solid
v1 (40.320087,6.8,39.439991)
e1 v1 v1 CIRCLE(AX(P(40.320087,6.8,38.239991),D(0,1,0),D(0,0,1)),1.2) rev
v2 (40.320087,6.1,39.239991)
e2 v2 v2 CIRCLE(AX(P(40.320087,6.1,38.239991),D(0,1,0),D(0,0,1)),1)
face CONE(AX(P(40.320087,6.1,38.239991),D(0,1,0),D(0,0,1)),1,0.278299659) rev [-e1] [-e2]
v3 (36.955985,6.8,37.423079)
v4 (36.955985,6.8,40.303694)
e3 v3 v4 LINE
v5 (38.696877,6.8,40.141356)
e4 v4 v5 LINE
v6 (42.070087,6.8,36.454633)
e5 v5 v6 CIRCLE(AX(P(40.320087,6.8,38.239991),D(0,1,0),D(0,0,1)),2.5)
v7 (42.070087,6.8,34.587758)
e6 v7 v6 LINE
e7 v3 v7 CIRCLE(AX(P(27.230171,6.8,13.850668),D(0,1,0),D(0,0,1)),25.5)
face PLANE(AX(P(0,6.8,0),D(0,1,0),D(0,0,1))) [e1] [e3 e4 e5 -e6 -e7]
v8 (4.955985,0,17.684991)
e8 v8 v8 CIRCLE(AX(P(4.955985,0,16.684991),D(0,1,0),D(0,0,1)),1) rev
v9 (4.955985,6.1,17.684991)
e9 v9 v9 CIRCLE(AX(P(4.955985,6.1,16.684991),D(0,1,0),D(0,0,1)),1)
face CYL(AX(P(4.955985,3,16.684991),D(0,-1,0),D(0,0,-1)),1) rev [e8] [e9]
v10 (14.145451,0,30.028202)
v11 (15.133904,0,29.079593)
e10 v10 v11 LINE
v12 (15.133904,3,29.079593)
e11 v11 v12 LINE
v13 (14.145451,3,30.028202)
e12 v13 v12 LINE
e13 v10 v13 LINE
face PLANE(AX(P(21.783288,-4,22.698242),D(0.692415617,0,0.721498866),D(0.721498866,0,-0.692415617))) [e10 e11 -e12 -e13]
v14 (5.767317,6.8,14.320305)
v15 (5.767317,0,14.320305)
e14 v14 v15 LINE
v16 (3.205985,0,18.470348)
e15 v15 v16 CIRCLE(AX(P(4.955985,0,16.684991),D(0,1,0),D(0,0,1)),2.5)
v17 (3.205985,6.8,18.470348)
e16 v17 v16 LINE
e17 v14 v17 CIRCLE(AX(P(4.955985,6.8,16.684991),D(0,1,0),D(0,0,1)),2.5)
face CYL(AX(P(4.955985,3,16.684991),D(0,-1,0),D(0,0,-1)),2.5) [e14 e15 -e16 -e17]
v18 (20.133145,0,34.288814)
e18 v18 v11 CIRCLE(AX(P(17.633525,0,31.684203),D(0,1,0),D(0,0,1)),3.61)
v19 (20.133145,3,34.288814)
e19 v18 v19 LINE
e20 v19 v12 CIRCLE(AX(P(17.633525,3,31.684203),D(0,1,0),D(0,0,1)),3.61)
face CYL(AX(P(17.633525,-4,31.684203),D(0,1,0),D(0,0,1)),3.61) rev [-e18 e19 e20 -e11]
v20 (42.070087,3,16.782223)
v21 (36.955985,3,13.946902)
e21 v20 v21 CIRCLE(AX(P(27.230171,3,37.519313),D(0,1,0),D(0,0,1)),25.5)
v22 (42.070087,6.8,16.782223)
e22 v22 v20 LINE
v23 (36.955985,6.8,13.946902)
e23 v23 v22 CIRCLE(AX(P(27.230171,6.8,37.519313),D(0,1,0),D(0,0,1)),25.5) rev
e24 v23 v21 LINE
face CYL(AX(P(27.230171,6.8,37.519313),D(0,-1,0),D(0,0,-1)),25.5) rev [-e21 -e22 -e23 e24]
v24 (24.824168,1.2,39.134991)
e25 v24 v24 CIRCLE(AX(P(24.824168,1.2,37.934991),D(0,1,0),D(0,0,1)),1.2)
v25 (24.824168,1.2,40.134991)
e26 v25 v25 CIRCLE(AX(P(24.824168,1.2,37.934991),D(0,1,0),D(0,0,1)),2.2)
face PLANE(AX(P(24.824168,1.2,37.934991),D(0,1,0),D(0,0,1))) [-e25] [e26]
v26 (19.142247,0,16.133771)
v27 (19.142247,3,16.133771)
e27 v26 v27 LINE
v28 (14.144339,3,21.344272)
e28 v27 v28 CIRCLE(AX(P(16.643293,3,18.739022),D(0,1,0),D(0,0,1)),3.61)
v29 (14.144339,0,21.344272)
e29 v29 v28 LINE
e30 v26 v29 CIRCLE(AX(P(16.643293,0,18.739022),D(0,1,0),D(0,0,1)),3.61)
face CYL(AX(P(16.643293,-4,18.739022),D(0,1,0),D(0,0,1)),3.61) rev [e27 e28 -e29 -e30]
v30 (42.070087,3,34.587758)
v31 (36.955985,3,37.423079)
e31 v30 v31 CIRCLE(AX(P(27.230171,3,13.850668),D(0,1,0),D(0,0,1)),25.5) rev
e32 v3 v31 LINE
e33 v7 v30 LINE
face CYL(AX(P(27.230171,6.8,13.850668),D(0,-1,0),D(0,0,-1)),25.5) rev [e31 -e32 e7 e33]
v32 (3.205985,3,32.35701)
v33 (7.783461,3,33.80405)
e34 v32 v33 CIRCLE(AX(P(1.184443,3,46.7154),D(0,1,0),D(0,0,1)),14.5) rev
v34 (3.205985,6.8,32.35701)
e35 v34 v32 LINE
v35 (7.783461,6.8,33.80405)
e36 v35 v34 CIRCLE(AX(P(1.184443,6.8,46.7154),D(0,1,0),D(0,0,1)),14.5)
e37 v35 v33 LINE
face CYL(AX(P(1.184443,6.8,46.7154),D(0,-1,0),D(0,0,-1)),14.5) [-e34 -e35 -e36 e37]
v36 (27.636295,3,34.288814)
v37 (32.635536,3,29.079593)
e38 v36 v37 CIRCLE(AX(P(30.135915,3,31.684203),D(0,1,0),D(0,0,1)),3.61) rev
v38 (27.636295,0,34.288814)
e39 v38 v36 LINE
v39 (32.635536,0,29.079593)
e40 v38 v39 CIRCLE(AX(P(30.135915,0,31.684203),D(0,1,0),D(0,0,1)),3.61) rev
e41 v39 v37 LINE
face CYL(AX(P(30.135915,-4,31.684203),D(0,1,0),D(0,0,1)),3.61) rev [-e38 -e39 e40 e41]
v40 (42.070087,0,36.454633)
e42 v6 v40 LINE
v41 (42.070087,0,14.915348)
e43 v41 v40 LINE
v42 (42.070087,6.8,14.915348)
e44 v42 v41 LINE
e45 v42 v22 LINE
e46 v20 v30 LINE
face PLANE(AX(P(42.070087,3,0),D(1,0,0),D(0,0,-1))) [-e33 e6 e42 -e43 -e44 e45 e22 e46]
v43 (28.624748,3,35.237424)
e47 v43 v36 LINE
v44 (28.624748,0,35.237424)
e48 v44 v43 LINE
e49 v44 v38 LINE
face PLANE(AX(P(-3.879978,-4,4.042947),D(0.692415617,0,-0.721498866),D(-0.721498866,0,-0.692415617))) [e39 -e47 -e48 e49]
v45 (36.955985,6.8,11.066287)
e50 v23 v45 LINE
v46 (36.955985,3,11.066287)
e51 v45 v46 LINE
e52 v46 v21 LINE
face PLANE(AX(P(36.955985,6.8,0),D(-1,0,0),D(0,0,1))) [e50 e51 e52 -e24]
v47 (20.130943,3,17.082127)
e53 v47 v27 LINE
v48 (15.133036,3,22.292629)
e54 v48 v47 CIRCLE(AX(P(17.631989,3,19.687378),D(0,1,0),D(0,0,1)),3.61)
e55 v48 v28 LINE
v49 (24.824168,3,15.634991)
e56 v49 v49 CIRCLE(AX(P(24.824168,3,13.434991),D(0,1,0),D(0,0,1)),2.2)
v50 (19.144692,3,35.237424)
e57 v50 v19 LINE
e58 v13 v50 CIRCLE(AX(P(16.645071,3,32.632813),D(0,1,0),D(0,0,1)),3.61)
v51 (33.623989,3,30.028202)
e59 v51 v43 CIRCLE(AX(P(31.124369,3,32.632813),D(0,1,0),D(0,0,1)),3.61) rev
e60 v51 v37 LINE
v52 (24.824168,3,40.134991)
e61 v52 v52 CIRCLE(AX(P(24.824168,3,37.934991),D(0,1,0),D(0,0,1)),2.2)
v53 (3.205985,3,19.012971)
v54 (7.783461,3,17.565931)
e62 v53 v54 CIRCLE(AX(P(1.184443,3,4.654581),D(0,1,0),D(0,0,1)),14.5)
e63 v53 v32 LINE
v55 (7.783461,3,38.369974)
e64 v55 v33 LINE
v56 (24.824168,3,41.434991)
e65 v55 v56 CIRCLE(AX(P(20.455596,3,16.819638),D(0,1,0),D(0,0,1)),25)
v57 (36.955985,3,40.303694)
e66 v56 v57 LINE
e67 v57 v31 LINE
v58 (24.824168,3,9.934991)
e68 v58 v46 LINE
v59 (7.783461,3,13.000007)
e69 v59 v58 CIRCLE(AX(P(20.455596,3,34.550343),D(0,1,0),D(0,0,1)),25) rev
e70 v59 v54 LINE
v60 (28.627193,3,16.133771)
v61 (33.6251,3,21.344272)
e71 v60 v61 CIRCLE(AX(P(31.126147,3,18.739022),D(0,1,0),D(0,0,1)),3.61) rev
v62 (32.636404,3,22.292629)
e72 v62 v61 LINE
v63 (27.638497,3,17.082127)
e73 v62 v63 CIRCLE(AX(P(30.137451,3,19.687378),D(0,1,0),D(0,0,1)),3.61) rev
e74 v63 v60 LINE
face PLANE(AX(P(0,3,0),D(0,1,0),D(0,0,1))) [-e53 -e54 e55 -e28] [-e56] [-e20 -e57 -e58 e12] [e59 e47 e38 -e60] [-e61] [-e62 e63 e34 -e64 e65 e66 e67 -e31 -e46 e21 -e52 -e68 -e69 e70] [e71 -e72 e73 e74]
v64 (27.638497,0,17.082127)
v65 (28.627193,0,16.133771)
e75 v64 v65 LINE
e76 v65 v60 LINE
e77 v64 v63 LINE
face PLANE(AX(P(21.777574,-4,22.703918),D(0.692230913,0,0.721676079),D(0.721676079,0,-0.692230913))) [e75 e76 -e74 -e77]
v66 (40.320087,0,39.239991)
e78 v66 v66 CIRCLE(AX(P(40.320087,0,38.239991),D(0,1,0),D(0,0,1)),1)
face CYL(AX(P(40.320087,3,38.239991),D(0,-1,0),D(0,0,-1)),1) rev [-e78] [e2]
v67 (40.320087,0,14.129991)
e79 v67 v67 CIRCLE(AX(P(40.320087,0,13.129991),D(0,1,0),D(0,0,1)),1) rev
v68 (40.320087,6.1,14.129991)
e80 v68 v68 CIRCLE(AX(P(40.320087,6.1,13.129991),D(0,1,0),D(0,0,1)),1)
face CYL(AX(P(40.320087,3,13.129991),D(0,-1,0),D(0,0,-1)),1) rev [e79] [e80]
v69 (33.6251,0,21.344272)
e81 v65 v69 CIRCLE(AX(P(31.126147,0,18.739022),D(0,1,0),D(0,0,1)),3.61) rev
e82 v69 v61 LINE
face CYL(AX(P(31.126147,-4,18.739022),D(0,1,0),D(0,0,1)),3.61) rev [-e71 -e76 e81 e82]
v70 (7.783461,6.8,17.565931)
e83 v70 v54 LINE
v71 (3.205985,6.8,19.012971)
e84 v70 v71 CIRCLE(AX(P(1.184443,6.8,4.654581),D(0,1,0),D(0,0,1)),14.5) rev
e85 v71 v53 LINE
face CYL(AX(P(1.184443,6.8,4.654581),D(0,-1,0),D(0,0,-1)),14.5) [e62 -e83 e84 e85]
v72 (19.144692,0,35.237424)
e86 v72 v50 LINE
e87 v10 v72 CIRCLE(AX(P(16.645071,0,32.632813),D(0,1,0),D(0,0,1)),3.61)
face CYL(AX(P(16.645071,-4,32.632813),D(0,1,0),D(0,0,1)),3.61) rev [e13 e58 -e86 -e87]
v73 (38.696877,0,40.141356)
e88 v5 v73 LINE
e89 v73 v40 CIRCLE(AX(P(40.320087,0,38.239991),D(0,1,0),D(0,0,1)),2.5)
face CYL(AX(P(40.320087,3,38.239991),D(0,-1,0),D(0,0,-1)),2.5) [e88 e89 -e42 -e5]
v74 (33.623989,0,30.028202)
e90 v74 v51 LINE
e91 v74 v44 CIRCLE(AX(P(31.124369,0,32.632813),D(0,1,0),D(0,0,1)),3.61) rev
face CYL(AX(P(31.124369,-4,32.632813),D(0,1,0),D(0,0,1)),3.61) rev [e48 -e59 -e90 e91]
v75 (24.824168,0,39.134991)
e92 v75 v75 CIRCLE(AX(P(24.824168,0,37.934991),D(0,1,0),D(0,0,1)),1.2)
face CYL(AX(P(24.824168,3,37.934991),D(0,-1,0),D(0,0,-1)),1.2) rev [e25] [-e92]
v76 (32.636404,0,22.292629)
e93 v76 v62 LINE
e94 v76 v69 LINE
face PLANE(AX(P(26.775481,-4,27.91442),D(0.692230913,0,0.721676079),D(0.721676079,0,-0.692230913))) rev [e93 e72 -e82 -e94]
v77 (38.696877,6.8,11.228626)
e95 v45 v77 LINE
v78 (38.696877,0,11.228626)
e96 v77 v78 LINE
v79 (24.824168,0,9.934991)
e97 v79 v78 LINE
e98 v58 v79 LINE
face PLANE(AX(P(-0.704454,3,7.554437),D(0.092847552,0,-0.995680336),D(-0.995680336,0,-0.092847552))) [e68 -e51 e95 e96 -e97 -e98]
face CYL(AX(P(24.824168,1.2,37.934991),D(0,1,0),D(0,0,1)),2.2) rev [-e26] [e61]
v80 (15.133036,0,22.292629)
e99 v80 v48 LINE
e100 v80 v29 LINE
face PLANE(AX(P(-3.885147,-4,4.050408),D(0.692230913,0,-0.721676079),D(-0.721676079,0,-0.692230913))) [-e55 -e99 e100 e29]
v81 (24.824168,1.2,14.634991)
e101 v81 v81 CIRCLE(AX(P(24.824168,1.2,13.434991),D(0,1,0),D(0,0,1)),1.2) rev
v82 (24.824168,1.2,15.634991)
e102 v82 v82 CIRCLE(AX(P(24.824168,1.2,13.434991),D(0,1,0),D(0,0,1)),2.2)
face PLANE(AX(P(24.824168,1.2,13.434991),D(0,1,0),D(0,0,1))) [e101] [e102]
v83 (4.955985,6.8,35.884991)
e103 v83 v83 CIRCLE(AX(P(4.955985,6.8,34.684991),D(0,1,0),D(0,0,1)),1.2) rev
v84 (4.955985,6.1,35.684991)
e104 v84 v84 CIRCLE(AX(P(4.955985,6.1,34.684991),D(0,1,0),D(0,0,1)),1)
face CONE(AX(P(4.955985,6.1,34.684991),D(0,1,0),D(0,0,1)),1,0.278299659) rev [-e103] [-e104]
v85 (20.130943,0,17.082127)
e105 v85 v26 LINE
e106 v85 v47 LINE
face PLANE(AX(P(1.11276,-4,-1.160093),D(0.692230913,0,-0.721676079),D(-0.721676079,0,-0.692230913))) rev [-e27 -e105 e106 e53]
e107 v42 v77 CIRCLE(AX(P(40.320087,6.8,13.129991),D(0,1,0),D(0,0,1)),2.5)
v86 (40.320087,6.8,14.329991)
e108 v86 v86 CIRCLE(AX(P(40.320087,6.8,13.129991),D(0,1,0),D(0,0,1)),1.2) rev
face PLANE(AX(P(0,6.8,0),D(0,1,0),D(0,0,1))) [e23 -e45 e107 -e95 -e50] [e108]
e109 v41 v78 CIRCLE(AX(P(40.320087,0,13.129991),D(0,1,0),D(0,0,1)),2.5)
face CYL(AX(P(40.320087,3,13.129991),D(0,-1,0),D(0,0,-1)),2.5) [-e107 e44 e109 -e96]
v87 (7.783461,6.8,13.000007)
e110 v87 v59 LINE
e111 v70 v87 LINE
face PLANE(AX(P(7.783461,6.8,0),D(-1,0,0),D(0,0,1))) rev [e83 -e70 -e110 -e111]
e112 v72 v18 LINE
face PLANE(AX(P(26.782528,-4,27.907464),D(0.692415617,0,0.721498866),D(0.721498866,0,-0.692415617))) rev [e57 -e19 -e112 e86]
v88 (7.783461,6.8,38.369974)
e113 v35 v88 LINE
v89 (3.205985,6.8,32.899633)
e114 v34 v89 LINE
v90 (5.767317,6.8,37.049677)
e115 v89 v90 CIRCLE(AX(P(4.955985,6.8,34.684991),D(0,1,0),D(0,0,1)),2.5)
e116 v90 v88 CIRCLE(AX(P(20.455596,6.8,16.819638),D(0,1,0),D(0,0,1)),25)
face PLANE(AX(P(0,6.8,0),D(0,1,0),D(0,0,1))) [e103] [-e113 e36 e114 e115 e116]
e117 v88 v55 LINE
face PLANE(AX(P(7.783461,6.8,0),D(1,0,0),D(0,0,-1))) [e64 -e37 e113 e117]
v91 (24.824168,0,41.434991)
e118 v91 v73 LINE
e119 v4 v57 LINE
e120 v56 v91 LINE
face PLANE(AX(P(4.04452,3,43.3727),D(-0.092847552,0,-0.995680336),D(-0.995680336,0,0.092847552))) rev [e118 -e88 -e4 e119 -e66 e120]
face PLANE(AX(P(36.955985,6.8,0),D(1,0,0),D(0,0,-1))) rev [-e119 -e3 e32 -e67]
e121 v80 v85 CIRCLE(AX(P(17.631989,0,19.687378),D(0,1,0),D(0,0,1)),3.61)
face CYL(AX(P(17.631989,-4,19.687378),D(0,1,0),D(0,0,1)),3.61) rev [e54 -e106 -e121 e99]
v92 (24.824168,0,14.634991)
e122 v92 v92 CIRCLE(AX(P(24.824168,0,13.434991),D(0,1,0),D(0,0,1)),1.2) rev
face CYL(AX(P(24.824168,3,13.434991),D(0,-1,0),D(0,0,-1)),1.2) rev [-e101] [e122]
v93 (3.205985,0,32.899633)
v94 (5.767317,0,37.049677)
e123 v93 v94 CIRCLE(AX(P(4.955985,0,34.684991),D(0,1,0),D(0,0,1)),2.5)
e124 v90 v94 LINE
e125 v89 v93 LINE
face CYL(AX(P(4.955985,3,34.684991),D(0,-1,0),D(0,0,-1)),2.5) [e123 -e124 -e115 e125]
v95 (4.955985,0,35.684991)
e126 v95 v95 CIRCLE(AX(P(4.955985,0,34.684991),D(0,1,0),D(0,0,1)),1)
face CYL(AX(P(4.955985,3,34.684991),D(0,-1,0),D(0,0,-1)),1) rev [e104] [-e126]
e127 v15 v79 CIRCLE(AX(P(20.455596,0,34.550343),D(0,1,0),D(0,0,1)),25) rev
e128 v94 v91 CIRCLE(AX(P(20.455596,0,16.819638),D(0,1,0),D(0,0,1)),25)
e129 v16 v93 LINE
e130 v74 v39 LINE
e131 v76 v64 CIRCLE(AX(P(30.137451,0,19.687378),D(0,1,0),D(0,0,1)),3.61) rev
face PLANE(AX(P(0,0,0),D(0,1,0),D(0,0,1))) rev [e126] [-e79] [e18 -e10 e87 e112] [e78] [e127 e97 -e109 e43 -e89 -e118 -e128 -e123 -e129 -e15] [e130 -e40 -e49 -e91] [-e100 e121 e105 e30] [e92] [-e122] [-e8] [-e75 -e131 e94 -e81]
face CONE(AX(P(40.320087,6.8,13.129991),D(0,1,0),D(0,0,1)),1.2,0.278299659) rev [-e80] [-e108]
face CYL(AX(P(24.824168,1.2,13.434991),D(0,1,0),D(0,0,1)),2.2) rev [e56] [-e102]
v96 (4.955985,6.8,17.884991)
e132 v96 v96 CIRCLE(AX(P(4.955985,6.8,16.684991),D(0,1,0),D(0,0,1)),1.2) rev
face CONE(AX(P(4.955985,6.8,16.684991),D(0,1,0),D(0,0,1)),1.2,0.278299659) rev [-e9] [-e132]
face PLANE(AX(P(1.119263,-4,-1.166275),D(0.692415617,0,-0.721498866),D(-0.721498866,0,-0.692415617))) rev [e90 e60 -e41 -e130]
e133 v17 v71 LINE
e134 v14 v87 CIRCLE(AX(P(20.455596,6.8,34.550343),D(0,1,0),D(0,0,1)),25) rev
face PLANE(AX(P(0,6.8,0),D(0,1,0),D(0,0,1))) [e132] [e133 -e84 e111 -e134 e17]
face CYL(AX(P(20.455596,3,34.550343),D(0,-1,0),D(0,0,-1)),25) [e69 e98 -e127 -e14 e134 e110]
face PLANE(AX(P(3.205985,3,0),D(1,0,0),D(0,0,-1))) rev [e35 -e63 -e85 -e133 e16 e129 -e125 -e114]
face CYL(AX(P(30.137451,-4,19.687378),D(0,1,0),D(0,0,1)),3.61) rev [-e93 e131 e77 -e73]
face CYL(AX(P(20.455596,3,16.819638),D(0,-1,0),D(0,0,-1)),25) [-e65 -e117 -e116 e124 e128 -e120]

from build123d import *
from OCP.BRepFilletAPI import BRepFilletAPI_MakeChamfer

# Parameters (mm, degrees)
SKETCH1_R           = 1
BOSS_EXTRUDE1_DEPTH = 3
SKETCH1_5_R         = 1
BOSS_EXTRUDE2_DEPTH = 6.8
CUT_EXTRUDE1_DEPTH  = 7
SKETCH3_R           = 2
CUT_EXTRUDE2_DEPTH  = 1.8
MOVE_START          = 3
MOVE_FACE1_DEPTH    = 3.8
MOVE_FACE2_BY       = 0.2
MOVE_FACE2_2_BY     = 0.2
MOVE_FACE2_3_BY     = 0.2
MOVE_FACE2_4_BY     = 0.2
CHAMFER1_SIZE       = 0.7
CHAMFER1_SIZE2      = 0.2
CHAMFER2_SIZE       = 0.2
CHAMFER2_SIZE2      = 0.7


# Read off the part's stored shape, not the designer's step: Move Face1
with BuildPart() as part:
    # Sketch1 → Boss-Extrude1 (new body)
    with BuildSketch(Plane(origin=(0, 0, 0), x_dir=(1, 0, 0), z_dir=(0, 1, 0))):
        with BuildLine():
            Line((24.824168418, -41.434990566), (38.696876617, -40.141355505))
            ThreePointArc((38.696876617, -40.141355505), (42.164537627, -39.927592778), (42.070086822, -36.454633459))
            Line((42.070086822, -36.454633459), (42.070086822, -14.915347673))
            ThreePointArc((42.070086822, -14.915347673), (42.164537627, -11.442388354), (38.696876617, -11.228625627))
            Line((38.696876617, -11.228625627), (24.824168418, -9.934990566))
            ThreePointArc((24.824168418, -9.934990566), (14.849186159, -10.187088505), (5.767316865, -14.320304511))
            ThreePointArc((5.767316865, -14.320304511), (2.828547545, -15.371974531), (3.205984711, -18.470347673))
            Line((3.205984711, -18.470347673), (3.205984711, -32.899633459))
            ThreePointArc((3.205984711, -32.899633459), (2.828547545, -35.998006601), (5.767316865, -37.04967662))
            ThreePointArc((5.767316865, -37.04967662), (14.849186159, -41.182892626), (24.824168418, -41.434990566))
        make_face()
        with Locations(Location((4.955984711, -34.684990566, 0), (0, 0, 270))):
            Circle(SKETCH1_R, mode=Mode.SUBTRACT)
        with Locations(Location((24.824168418, -37.934990566, 0), (0, 0, 270))):
            Circle(SKETCH1_R, mode=Mode.SUBTRACT)
        with Locations(Location((40.320086822, -38.239990566, 0), (0, 0, 270))):
            Circle(SKETCH1_R, mode=Mode.SUBTRACT)
        with Locations(Location((4.955984711, -16.684990566, 0), (0, 0, 270))):
            Circle(SKETCH1_R, mode=Mode.SUBTRACT)
        with Locations(Location((24.824168418, -13.434990566, 0), (0, 0, 270))):
            Circle(SKETCH1_R, mode=Mode.SUBTRACT)
        with Locations(Location((40.320086822, -13.129990566, 0), (0, 0, 270))):
            Circle(SKETCH1_R, mode=Mode.SUBTRACT)
    extrude(amount=BOSS_EXTRUDE1_DEPTH)

    # Sketch1<5> → Boss-Extrude2 (add)
    # profile 1 of 8: a face of its own
    with BuildSketch(Plane(origin=(0, 0, 0), x_dir=(1, 0, 0), z_dir=(0, 1, 0))):
        with BuildLine():
            ThreePointArc((5.767316865, -37.04967662), (6.75947019, -37.734134037), (7.783460986, -38.369974447))
            Line((7.783460986, -38.369974447), (7.783460986, -33.244952788))
            ThreePointArc((7.783460986, -33.244952788), (6.373824255, -32.641654601), (4.909963227, -32.185414197))
            ThreePointArc((4.909963227, -32.185414197), (4.062798529, -31.99415486), (3.205984711, -31.852245597))
            Line((3.205984711, -31.852245597), (3.205984711, -32.899633459))
            Line((3.205984711, -32.899633459), (3.205984711, -34.684990566))
            ThreePointArc((3.205984711, -34.684990566), (3.718547844, -35.922427433), (4.955984711, -36.434990566))
            ThreePointArc((4.955984711, -36.434990566), (5.358522051, -36.746463253), (5.767316865, -37.04967662))
        make_face()
        with Locations(Location((4.955984711, -34.684990566, 0), (0, 0, 270))):
            Circle(SKETCH1_5_R, mode=Mode.SUBTRACT)
    # profile 2 of 8: a face of its own
    with BuildSketch(Plane(origin=(0, 0, 0), x_dir=(1, 0, 0), z_dir=(0, 1, 0))):
        with BuildLine():
            ThreePointArc((36.955984711, -14.488712586), (39.599003683, -15.793476237), (42.070086822, -17.400244917))
            Line((42.070086822, -17.400244917), (42.070086822, -14.915347673))
            Line((42.070086822, -14.915347673), (42.070086822, -13.129990566))
            ThreePointArc((42.070086822, -13.129990566), (41.557523689, -11.892553699), (40.320086822, -11.379990566))
            Line((40.320086822, -11.379990566), (38.696876617, -11.228625627))
            Line((38.696876617, -11.228625627), (36.955984711, -11.066286826))
            Line((36.955984711, -11.066286826), (36.955984711, -14.488712586))
        make_face()
        with Locations(Location((40.320086822, -13.129990566, 0), (0, 0, 270))):
            Circle(SKETCH1_5_R, mode=Mode.SUBTRACT)
    # profile 3 of 8: a face of its own
    with BuildSketch(Plane(origin=(0, 0, 0), x_dir=(1, 0, 0), z_dir=(0, 1, 0))):
        with BuildLine():
            Line((3.205984711, -18.470347673), (3.205984711, -19.517735535))
            ThreePointArc((3.205984711, -19.517735535), (5.55061073, -19.005071272), (7.783460986, -18.125028343))
            Line((7.783460986, -18.125028343), (7.783460986, -13.000006684))
            ThreePointArc((7.783460986, -13.000006684), (6.75947019, -13.635847094), (5.767316865, -14.320304511))
            ThreePointArc((5.767316865, -14.320304511), (5.358522051, -14.623517879), (4.955984711, -14.934990566))
            ThreePointArc((4.955984711, -14.934990566), (3.718547844, -15.447553699), (3.205984711, -16.684990566))
            Line((3.205984711, -16.684990566), (3.205984711, -18.470347673))
        make_face()
        with Locations(Location((4.955984711, -16.684990566, 0), (0, 0, 270))):
            Circle(SKETCH1_5_R, mode=Mode.SUBTRACT)
    # profile 4 of 8: a face of its own
    with BuildSketch(Plane(origin=(0, 0, 0), x_dir=(1, 0, 0), z_dir=(0, 1, 0))):
        with BuildLine():
            Line((36.955984711, -36.881268545), (36.955984711, -40.303694305))
            Line((36.955984711, -40.303694305), (38.696876617, -40.141355505))
            Line((38.696876617, -40.141355505), (40.320086822, -39.989990566))
            ThreePointArc((40.320086822, -39.989990566), (41.557523689, -39.477427433), (42.070086822, -38.239990566))
            Line((42.070086822, -38.239990566), (42.070086822, -36.454633459))
            Line((42.070086822, -36.454633459), (42.070086822, -33.969736214))
            ThreePointArc((42.070086822, -33.969736214), (39.599003683, -35.576504894), (36.955984711, -36.881268545))
        make_face()
        with Locations(Location((40.320086822, -38.239990566, 0), (0, 0, 270))):
            Circle(SKETCH1_5_R, mode=Mode.SUBTRACT)
    # profile 5 of 8: a face of its own
    with BuildSketch(Plane(origin=(0, 0, 0), x_dir=(1, 0, 0), z_dir=(0, 1, 0))):
        with BuildLine():
            ThreePointArc((5.767316865, -14.320304511), (2.828547545, -15.371974531), (3.205984711, -18.470347673))
            Line((3.205984711, -18.470347673), (3.205984711, -16.684990566))
            ThreePointArc((3.205984711, -16.684990566), (3.718547844, -15.447553699), (4.955984711, -14.934990566))
            ThreePointArc((4.955984711, -14.934990566), (5.358522051, -14.623517879), (5.767316865, -14.320304511))
        make_face()
    # profile 6 of 8: a face of its own
    with BuildSketch(Plane(origin=(0, 0, 0), x_dir=(1, 0, 0), z_dir=(0, 1, 0))):
        with BuildLine():
            ThreePointArc((3.205984711, -32.899633459), (2.828547545, -35.998006601), (5.767316865, -37.04967662))
            ThreePointArc((5.767316865, -37.04967662), (5.358522051, -36.746463253), (4.955984711, -36.434990566))
            ThreePointArc((4.955984711, -36.434990566), (3.718547844, -35.922427433), (3.205984711, -34.684990566))
            Line((3.205984711, -34.684990566), (3.205984711, -32.899633459))
        make_face()
    # profile 7 of 8: a face of its own
    with BuildSketch(Plane(origin=(0, 0, 0), x_dir=(1, 0, 0), z_dir=(0, 1, 0))):
        with BuildLine():
            Line((42.070086822, -13.129990566), (42.070086822, -14.915347673))
            ThreePointArc((42.070086822, -14.915347673), (42.164537627, -11.442388354), (38.696876617, -11.228625627))
            Line((38.696876617, -11.228625627), (40.320086822, -11.379990566))
            ThreePointArc((40.320086822, -11.379990566), (41.557523689, -11.892553699), (42.070086822, -13.129990566))
        make_face()
    # profile 8 of 8: a face of its own
    with BuildSketch(Plane(origin=(0, 0, 0), x_dir=(1, 0, 0), z_dir=(0, 1, 0))):
        with BuildLine():
            Line((40.320086822, -39.989990566), (38.696876617, -40.141355505))
            ThreePointArc((38.696876617, -40.141355505), (42.164537627, -39.927592778), (42.070086822, -36.454633459))
            Line((42.070086822, -36.454633459), (42.070086822, -38.239990566))
            ThreePointArc((42.070086822, -38.239990566), (41.557523689, -39.477427433), (40.320086822, -39.989990566))
        make_face()
    extrude(amount=BOSS_EXTRUDE2_DEPTH)

    # Sketch2 → Cut-Extrude1 (cut)
    # profile 1 of 7: a face of its own
    with BuildSketch(Plane(origin=(0, 3, 0), x_dir=(1, 0, 0), z_dir=(0, 1, 0))):
        with BuildLine():
            Line((15.133035567, -22.292628664), (14.144339339, -21.344272313))
            ThreePointArc((14.144339339, -21.344272313), (14.038042286, -16.240068072), (19.142246528, -16.13377102))
            Line((19.142246528, -16.13377102), (20.130942756, -17.08212737))
            ThreePointArc((20.130942756, -17.08212737), (20.237239809, -22.186331611), (15.133035567, -22.292628664))
        make_face()
        with BuildLine():
            ThreePointArc((17.757784702, -17.577123179), (15.481394445, -17.624529897), (15.528801164, -19.900920155))
            Line((15.528801164, -19.900920155), (16.517497393, -20.849276505))
            ThreePointArc((16.517497393, -20.849276505), (18.79388765, -20.801869786), (18.746480931, -18.525479529))
            Line((18.746480931, -18.525479529), (17.757784702, -17.577123179))
        make_face(mode=Mode.SUBTRACT)
    # profile 2 of 7: a face of its own
    with BuildSketch(Plane(origin=(0, 3, 0), x_dir=(1, 0, 0), z_dir=(0, 1, 0))):
        with BuildLine():
            ThreePointArc((32.636404248, -22.292628664), (27.532200006, -22.186331611), (27.638497059, -17.08212737))
            Line((27.638497059, -17.08212737), (28.627193287, -16.13377102))
            ThreePointArc((28.627193287, -16.13377102), (33.731397529, -16.240068072), (33.625100476, -21.344272313))
            Line((33.625100476, -21.344272313), (32.636404248, -22.292628664))
        make_face()
        with BuildLine():
            Line((29.022958884, -18.525479529), (30.011655113, -17.577123179))
            ThreePointArc((30.011655113, -17.577123179), (32.28804537, -17.624529897), (32.240638651, -19.900920155))
            Line((32.240638651, -19.900920155), (31.251942422, -20.849276505))
            ThreePointArc((31.251942422, -20.849276505), (28.975552165, -20.801869786), (29.022958884, -18.525479529))
        make_face(mode=Mode.SUBTRACT)
    # profile 3 of 7: a face of its own
    with BuildSketch(Plane(origin=(0, 3, 0), x_dir=(1, 0, 0), z_dir=(0, 1, 0))):
        with BuildLine():
            ThreePointArc((30.011655113, -17.577123179), (32.28804537, -17.624529897), (32.240638651, -19.900920155))
            Line((32.240638651, -19.900920155), (31.251942422, -20.849276505))
            ThreePointArc((31.251942422, -20.849276505), (28.975552165, -20.801869786), (29.022958884, -18.525479529))
            Line((29.022958884, -18.525479529), (30.011655113, -17.577123179))
        make_face()
    # profile 4 of 7: a face of its own
    with BuildSketch(Plane(origin=(0, 3, 0), x_dir=(1, 0, 0), z_dir=(0, 1, 0))):
        with BuildLine():
            ThreePointArc((33.623989066, -30.028201915), (33.728979595, -35.132433198), (28.624748312, -35.237423727))
            Line((28.624748312, -35.237423727), (27.636294866, -34.288814332))
            ThreePointArc((27.636294866, -34.288814332), (27.531304337, -29.184583049), (32.63553562, -29.07959252))
            Line((32.63553562, -29.07959252), (33.623989066, -30.028201915))
        make_face()
        with BuildLine():
            Line((30.009579546, -33.794425995), (29.0211261, -32.8458166))
            ThreePointArc((29.0211261, -32.8458166), (28.974302069, -30.569414283), (31.250704386, -30.522590252))
            Line((31.250704386, -30.522590252), (32.239157832, -31.471199647))
            ThreePointArc((32.239157832, -31.471199647), (32.285981863, -33.747601964), (30.009579546, -33.794425995))
        make_face(mode=Mode.SUBTRACT)
    # profile 5 of 7: a face of its own
    with BuildSketch(Plane(origin=(0, 3, 0), x_dir=(1, 0, 0), z_dir=(0, 1, 0))):
        with BuildLine():
            ThreePointArc((29.0211261, -32.8458166), (28.974302069, -30.569414283), (31.250704386, -30.522590252))
            Line((31.250704386, -30.522590252), (32.239157832, -31.471199647))
            ThreePointArc((32.239157832, -31.471199647), (32.285981863, -33.747601964), (30.009579546, -33.794425995))
            Line((30.009579546, -33.794425995), (29.0211261, -32.8458166))
        make_face()
    # profile 6 of 7: a face of its own
    with BuildSketch(Plane(origin=(0, 3, 0), x_dir=(1, 0, 0), z_dir=(0, 1, 0))):
        with BuildLine():
            Line((14.145450749, -30.028201915), (15.133904195, -29.07959252))
            ThreePointArc((15.133904195, -29.07959252), (20.238135478, -29.184583049), (20.133144949, -34.288814332))
            Line((20.133144949, -34.288814332), (19.144691503, -35.237423727))
            ThreePointArc((19.144691503, -35.237423727), (14.04046022, -35.132433198), (14.145450749, -30.028201915))
        make_face()
        with BuildLine():
            ThreePointArc((18.748313715, -32.8458166), (18.795137746, -30.569414283), (16.518735429, -30.522590252))
            Line((16.518735429, -30.522590252), (15.530281983, -31.471199647))
            ThreePointArc((15.530281983, -31.471199647), (15.483457952, -33.747601964), (17.759860269, -33.794425995))
            Line((17.759860269, -33.794425995), (18.748313715, -32.8458166))
        make_face(mode=Mode.SUBTRACT)
    # profile 7 of 7: a face of its own
    with BuildSketch(Plane(origin=(0, 3, 0), x_dir=(1, 0, 0), z_dir=(0, 1, 0))):
        with BuildLine():
            Line((17.759860269, -33.794425995), (18.748313715, -32.8458166))
            ThreePointArc((18.748313715, -32.8458166), (18.795137746, -30.569414283), (16.518735429, -30.522590252))
            Line((16.518735429, -30.522590252), (15.530281983, -31.471199647))
            ThreePointArc((15.530281983, -31.471199647), (15.483457952, -33.747601964), (17.759860269, -33.794425995))
        make_face()
    extrude(amount=-CUT_EXTRUDE1_DEPTH, mode=Mode.SUBTRACT)


with BuildPart() as cut_extrude1_kept_piece:
    # of the separate pieces the step leaves, the one the design keeps (cut_extrude1_pieces_kept)
    add(part.part.solids().sort_by_distance((24.824168418, 0, 41.434990566))[0])

    # Sketch3 → Cut-Extrude2 (cut)
    with BuildSketch(Plane(origin=(0, 3, 0), x_dir=(1, 0, 0), z_dir=(0, 1, 0))):
        with Locations(Location((24.824168418, -13.434990566, 0), (0, 0, 270))):
            Circle(SKETCH3_R)
        with Locations(Location((24.824168418, -37.934990566, 0), (0, 0, 270))):
            Circle(SKETCH3_R)
    extrude(amount=-CUT_EXTRUDE2_DEPTH, mode=Mode.SUBTRACT)

    # Move Face1 outline → Move Face1 (cut)
    with BuildSketch(Plane(origin=(0, 0, 0), x_dir=(1, 0, 0), z_dir=(0, 1, 0)).offset(MOVE_START)):
        with BuildLine():
            Line((7.783460986, -18.125028343), (7.783460986, -17.565930728))
            ThreePointArc((7.783460986, -17.565930728), (5.555025764, -18.48020931), (3.205984711, -19.012970982))
            Line((3.205984711, -19.012970982), (3.205984711, -19.517735535))
            ThreePointArc((3.205984711, -19.517735535), (5.550610731, -19.005071272), (7.783460986, -18.125028343))
        make_face()
        with BuildLine():
            ThreePointArc((7.783460986, -33.244952788), (5.550610731, -32.364909859), (3.205984711, -31.852245597))
            Line((3.205984711, -31.852245597), (3.205984711, -32.357010149))
            ThreePointArc((3.205984711, -32.357010149), (5.555025764, -32.889771821), (7.783460986, -33.804050403))
            Line((7.783460986, -33.804050403), (7.783460986, -33.244952788))
        make_face()
        with BuildLine():
            Line((42.070086822, -34.587758113), (42.070086822, -33.969736214))
            ThreePointArc((42.070086822, -33.969736214), (39.599003683, -35.576504894), (36.955984711, -36.881268545))
            Line((36.955984711, -36.881268545), (36.955984711, -37.423079034))
            ThreePointArc((36.955984711, -37.423079034), (39.594576687, -36.152494903), (42.070086822, -34.587758113))
        make_face()
        with BuildLine():
            ThreePointArc((42.070086822, -16.782223018), (39.594576687, -15.217486228), (36.955984711, -13.946902097))
            Line((36.955984711, -13.946902097), (36.955984711, -14.488712586))
            ThreePointArc((36.955984711, -14.488712586), (39.599003683, -15.793476237), (42.070086822, -17.400244917))
            Line((42.070086822, -17.400244917), (42.070086822, -16.782223018))
        make_face()
    extrude(amount=MOVE_FACE1_DEPTH, mode=Mode.SUBTRACT)

    # Move Face2: a curved face moved inward by 0.2
    add(Solid.thicken(cut_extrude1_kept_piece.faces().sort_by_distance((24.824168418, 2.1, 11.434990566))[0], -MOVE_FACE2_BY), mode=Mode.SUBTRACT)

    # Move Face2 2: a curved face moved inward by 0.2
    add(Solid.thicken(cut_extrude1_kept_piece.faces().sort_by_distance((24.824168418, 2.1, 35.934990566))[0], -MOVE_FACE2_2_BY), mode=Mode.SUBTRACT)

    # Move Face2 3: a curved face moved inward by 0.2
    add(Solid.thicken(cut_extrude1_kept_piece.faces().sort_by_distance((24.824168418, 0.6, 12.434990566))[0], -MOVE_FACE2_3_BY), mode=Mode.SUBTRACT)

    # Move Face2 4: a curved face moved inward by 0.2
    add(Solid.thicken(cut_extrude1_kept_piece.faces().sort_by_distance((24.824168418, 0.6, 36.934990566))[0], -MOVE_FACE2_4_BY), mode=Mode.SUBTRACT)

    # Chamfer1: one chamfer whose edges measure the first distance from different faces: ONE call of the kernel's chamfer builder (chamfer() names one face for all edges)
    chamfer1_edges_1 = [cut_extrude1_kept_piece.edges().sort_by_distance(p)[0] for p in [
        (40.320086822, 6.8, 12.129990566),
    ]]
    chamfer1_side_1 = [cut_extrude1_kept_piece.faces().sort_by_distance(p)[0] for p in [
        (40.320086822, 3.4, 12.129990566),
    ]]
    chamfer1_edges_2 = [cut_extrude1_kept_piece.edges().sort_by_distance(p)[0] for p in [
        (4.955984711, 6.8, 15.684990566),
    ]]
    chamfer1_side_2 = [cut_extrude1_kept_piece.faces().sort_by_distance(p)[0] for p in [
        (4.955984711, 3.4, 15.684990566),
    ]]
    chamfer1 = BRepFilletAPI_MakeChamfer(cut_extrude1_kept_piece.part.solid().wrapped)
    for e in chamfer1_edges_1:
        chamfer1.Add(CHAMFER1_SIZE, CHAMFER1_SIZE2, e.wrapped, chamfer1_side_1[0].wrapped)  # the first distance lies on this face
    for e in chamfer1_edges_2:
        chamfer1.Add(CHAMFER1_SIZE, CHAMFER1_SIZE2, e.wrapped, chamfer1_side_2[0].wrapped)  # the first distance lies on this face
    add(Compound.cast(chamfer1.Shape()), mode=Mode.REPLACE)

    # Chamfer2: one chamfer whose edges measure the first distance from different faces: ONE call of the kernel's chamfer builder (chamfer() names one face for all edges)
    chamfer2_edges_1 = [cut_extrude1_kept_piece.edges().sort_by_distance(p)[0] for p in [
        (40.320086822, 6.8, 37.239990566),
    ]]
    chamfer2_side_1 = [cut_extrude1_kept_piece.faces().sort_by_distance(p)[0] for p in [
        (41.985094082, 6.8, 35.521195786),
    ]]
    chamfer2_edges_2 = [cut_extrude1_kept_piece.edges().sort_by_distance(p)[0] for p in [
        (4.955984711, 6.8, 33.684990566),
    ]]
    chamfer2_side_2 = [cut_extrude1_kept_piece.faces().sort_by_distance(p)[0] for p in [
        (3.286320097, 6.8, 32.628321804),
    ]]
    chamfer2 = BRepFilletAPI_MakeChamfer(cut_extrude1_kept_piece.part.solid().wrapped)
    for e in chamfer2_edges_1:
        chamfer2.Add(CHAMFER2_SIZE, CHAMFER2_SIZE2, e.wrapped, chamfer2_side_1[0].wrapped)  # the first distance lies on this face
    for e in chamfer2_edges_2:
        chamfer2.Add(CHAMFER2_SIZE, CHAMFER2_SIZE2, e.wrapped, chamfer2_side_2[0].wrapped)  # the first distance lies on this face
    add(Compound.cast(chamfer2.Shape()), mode=Mode.REPLACE)


solid = cut_extrude1_kept_piece.part
